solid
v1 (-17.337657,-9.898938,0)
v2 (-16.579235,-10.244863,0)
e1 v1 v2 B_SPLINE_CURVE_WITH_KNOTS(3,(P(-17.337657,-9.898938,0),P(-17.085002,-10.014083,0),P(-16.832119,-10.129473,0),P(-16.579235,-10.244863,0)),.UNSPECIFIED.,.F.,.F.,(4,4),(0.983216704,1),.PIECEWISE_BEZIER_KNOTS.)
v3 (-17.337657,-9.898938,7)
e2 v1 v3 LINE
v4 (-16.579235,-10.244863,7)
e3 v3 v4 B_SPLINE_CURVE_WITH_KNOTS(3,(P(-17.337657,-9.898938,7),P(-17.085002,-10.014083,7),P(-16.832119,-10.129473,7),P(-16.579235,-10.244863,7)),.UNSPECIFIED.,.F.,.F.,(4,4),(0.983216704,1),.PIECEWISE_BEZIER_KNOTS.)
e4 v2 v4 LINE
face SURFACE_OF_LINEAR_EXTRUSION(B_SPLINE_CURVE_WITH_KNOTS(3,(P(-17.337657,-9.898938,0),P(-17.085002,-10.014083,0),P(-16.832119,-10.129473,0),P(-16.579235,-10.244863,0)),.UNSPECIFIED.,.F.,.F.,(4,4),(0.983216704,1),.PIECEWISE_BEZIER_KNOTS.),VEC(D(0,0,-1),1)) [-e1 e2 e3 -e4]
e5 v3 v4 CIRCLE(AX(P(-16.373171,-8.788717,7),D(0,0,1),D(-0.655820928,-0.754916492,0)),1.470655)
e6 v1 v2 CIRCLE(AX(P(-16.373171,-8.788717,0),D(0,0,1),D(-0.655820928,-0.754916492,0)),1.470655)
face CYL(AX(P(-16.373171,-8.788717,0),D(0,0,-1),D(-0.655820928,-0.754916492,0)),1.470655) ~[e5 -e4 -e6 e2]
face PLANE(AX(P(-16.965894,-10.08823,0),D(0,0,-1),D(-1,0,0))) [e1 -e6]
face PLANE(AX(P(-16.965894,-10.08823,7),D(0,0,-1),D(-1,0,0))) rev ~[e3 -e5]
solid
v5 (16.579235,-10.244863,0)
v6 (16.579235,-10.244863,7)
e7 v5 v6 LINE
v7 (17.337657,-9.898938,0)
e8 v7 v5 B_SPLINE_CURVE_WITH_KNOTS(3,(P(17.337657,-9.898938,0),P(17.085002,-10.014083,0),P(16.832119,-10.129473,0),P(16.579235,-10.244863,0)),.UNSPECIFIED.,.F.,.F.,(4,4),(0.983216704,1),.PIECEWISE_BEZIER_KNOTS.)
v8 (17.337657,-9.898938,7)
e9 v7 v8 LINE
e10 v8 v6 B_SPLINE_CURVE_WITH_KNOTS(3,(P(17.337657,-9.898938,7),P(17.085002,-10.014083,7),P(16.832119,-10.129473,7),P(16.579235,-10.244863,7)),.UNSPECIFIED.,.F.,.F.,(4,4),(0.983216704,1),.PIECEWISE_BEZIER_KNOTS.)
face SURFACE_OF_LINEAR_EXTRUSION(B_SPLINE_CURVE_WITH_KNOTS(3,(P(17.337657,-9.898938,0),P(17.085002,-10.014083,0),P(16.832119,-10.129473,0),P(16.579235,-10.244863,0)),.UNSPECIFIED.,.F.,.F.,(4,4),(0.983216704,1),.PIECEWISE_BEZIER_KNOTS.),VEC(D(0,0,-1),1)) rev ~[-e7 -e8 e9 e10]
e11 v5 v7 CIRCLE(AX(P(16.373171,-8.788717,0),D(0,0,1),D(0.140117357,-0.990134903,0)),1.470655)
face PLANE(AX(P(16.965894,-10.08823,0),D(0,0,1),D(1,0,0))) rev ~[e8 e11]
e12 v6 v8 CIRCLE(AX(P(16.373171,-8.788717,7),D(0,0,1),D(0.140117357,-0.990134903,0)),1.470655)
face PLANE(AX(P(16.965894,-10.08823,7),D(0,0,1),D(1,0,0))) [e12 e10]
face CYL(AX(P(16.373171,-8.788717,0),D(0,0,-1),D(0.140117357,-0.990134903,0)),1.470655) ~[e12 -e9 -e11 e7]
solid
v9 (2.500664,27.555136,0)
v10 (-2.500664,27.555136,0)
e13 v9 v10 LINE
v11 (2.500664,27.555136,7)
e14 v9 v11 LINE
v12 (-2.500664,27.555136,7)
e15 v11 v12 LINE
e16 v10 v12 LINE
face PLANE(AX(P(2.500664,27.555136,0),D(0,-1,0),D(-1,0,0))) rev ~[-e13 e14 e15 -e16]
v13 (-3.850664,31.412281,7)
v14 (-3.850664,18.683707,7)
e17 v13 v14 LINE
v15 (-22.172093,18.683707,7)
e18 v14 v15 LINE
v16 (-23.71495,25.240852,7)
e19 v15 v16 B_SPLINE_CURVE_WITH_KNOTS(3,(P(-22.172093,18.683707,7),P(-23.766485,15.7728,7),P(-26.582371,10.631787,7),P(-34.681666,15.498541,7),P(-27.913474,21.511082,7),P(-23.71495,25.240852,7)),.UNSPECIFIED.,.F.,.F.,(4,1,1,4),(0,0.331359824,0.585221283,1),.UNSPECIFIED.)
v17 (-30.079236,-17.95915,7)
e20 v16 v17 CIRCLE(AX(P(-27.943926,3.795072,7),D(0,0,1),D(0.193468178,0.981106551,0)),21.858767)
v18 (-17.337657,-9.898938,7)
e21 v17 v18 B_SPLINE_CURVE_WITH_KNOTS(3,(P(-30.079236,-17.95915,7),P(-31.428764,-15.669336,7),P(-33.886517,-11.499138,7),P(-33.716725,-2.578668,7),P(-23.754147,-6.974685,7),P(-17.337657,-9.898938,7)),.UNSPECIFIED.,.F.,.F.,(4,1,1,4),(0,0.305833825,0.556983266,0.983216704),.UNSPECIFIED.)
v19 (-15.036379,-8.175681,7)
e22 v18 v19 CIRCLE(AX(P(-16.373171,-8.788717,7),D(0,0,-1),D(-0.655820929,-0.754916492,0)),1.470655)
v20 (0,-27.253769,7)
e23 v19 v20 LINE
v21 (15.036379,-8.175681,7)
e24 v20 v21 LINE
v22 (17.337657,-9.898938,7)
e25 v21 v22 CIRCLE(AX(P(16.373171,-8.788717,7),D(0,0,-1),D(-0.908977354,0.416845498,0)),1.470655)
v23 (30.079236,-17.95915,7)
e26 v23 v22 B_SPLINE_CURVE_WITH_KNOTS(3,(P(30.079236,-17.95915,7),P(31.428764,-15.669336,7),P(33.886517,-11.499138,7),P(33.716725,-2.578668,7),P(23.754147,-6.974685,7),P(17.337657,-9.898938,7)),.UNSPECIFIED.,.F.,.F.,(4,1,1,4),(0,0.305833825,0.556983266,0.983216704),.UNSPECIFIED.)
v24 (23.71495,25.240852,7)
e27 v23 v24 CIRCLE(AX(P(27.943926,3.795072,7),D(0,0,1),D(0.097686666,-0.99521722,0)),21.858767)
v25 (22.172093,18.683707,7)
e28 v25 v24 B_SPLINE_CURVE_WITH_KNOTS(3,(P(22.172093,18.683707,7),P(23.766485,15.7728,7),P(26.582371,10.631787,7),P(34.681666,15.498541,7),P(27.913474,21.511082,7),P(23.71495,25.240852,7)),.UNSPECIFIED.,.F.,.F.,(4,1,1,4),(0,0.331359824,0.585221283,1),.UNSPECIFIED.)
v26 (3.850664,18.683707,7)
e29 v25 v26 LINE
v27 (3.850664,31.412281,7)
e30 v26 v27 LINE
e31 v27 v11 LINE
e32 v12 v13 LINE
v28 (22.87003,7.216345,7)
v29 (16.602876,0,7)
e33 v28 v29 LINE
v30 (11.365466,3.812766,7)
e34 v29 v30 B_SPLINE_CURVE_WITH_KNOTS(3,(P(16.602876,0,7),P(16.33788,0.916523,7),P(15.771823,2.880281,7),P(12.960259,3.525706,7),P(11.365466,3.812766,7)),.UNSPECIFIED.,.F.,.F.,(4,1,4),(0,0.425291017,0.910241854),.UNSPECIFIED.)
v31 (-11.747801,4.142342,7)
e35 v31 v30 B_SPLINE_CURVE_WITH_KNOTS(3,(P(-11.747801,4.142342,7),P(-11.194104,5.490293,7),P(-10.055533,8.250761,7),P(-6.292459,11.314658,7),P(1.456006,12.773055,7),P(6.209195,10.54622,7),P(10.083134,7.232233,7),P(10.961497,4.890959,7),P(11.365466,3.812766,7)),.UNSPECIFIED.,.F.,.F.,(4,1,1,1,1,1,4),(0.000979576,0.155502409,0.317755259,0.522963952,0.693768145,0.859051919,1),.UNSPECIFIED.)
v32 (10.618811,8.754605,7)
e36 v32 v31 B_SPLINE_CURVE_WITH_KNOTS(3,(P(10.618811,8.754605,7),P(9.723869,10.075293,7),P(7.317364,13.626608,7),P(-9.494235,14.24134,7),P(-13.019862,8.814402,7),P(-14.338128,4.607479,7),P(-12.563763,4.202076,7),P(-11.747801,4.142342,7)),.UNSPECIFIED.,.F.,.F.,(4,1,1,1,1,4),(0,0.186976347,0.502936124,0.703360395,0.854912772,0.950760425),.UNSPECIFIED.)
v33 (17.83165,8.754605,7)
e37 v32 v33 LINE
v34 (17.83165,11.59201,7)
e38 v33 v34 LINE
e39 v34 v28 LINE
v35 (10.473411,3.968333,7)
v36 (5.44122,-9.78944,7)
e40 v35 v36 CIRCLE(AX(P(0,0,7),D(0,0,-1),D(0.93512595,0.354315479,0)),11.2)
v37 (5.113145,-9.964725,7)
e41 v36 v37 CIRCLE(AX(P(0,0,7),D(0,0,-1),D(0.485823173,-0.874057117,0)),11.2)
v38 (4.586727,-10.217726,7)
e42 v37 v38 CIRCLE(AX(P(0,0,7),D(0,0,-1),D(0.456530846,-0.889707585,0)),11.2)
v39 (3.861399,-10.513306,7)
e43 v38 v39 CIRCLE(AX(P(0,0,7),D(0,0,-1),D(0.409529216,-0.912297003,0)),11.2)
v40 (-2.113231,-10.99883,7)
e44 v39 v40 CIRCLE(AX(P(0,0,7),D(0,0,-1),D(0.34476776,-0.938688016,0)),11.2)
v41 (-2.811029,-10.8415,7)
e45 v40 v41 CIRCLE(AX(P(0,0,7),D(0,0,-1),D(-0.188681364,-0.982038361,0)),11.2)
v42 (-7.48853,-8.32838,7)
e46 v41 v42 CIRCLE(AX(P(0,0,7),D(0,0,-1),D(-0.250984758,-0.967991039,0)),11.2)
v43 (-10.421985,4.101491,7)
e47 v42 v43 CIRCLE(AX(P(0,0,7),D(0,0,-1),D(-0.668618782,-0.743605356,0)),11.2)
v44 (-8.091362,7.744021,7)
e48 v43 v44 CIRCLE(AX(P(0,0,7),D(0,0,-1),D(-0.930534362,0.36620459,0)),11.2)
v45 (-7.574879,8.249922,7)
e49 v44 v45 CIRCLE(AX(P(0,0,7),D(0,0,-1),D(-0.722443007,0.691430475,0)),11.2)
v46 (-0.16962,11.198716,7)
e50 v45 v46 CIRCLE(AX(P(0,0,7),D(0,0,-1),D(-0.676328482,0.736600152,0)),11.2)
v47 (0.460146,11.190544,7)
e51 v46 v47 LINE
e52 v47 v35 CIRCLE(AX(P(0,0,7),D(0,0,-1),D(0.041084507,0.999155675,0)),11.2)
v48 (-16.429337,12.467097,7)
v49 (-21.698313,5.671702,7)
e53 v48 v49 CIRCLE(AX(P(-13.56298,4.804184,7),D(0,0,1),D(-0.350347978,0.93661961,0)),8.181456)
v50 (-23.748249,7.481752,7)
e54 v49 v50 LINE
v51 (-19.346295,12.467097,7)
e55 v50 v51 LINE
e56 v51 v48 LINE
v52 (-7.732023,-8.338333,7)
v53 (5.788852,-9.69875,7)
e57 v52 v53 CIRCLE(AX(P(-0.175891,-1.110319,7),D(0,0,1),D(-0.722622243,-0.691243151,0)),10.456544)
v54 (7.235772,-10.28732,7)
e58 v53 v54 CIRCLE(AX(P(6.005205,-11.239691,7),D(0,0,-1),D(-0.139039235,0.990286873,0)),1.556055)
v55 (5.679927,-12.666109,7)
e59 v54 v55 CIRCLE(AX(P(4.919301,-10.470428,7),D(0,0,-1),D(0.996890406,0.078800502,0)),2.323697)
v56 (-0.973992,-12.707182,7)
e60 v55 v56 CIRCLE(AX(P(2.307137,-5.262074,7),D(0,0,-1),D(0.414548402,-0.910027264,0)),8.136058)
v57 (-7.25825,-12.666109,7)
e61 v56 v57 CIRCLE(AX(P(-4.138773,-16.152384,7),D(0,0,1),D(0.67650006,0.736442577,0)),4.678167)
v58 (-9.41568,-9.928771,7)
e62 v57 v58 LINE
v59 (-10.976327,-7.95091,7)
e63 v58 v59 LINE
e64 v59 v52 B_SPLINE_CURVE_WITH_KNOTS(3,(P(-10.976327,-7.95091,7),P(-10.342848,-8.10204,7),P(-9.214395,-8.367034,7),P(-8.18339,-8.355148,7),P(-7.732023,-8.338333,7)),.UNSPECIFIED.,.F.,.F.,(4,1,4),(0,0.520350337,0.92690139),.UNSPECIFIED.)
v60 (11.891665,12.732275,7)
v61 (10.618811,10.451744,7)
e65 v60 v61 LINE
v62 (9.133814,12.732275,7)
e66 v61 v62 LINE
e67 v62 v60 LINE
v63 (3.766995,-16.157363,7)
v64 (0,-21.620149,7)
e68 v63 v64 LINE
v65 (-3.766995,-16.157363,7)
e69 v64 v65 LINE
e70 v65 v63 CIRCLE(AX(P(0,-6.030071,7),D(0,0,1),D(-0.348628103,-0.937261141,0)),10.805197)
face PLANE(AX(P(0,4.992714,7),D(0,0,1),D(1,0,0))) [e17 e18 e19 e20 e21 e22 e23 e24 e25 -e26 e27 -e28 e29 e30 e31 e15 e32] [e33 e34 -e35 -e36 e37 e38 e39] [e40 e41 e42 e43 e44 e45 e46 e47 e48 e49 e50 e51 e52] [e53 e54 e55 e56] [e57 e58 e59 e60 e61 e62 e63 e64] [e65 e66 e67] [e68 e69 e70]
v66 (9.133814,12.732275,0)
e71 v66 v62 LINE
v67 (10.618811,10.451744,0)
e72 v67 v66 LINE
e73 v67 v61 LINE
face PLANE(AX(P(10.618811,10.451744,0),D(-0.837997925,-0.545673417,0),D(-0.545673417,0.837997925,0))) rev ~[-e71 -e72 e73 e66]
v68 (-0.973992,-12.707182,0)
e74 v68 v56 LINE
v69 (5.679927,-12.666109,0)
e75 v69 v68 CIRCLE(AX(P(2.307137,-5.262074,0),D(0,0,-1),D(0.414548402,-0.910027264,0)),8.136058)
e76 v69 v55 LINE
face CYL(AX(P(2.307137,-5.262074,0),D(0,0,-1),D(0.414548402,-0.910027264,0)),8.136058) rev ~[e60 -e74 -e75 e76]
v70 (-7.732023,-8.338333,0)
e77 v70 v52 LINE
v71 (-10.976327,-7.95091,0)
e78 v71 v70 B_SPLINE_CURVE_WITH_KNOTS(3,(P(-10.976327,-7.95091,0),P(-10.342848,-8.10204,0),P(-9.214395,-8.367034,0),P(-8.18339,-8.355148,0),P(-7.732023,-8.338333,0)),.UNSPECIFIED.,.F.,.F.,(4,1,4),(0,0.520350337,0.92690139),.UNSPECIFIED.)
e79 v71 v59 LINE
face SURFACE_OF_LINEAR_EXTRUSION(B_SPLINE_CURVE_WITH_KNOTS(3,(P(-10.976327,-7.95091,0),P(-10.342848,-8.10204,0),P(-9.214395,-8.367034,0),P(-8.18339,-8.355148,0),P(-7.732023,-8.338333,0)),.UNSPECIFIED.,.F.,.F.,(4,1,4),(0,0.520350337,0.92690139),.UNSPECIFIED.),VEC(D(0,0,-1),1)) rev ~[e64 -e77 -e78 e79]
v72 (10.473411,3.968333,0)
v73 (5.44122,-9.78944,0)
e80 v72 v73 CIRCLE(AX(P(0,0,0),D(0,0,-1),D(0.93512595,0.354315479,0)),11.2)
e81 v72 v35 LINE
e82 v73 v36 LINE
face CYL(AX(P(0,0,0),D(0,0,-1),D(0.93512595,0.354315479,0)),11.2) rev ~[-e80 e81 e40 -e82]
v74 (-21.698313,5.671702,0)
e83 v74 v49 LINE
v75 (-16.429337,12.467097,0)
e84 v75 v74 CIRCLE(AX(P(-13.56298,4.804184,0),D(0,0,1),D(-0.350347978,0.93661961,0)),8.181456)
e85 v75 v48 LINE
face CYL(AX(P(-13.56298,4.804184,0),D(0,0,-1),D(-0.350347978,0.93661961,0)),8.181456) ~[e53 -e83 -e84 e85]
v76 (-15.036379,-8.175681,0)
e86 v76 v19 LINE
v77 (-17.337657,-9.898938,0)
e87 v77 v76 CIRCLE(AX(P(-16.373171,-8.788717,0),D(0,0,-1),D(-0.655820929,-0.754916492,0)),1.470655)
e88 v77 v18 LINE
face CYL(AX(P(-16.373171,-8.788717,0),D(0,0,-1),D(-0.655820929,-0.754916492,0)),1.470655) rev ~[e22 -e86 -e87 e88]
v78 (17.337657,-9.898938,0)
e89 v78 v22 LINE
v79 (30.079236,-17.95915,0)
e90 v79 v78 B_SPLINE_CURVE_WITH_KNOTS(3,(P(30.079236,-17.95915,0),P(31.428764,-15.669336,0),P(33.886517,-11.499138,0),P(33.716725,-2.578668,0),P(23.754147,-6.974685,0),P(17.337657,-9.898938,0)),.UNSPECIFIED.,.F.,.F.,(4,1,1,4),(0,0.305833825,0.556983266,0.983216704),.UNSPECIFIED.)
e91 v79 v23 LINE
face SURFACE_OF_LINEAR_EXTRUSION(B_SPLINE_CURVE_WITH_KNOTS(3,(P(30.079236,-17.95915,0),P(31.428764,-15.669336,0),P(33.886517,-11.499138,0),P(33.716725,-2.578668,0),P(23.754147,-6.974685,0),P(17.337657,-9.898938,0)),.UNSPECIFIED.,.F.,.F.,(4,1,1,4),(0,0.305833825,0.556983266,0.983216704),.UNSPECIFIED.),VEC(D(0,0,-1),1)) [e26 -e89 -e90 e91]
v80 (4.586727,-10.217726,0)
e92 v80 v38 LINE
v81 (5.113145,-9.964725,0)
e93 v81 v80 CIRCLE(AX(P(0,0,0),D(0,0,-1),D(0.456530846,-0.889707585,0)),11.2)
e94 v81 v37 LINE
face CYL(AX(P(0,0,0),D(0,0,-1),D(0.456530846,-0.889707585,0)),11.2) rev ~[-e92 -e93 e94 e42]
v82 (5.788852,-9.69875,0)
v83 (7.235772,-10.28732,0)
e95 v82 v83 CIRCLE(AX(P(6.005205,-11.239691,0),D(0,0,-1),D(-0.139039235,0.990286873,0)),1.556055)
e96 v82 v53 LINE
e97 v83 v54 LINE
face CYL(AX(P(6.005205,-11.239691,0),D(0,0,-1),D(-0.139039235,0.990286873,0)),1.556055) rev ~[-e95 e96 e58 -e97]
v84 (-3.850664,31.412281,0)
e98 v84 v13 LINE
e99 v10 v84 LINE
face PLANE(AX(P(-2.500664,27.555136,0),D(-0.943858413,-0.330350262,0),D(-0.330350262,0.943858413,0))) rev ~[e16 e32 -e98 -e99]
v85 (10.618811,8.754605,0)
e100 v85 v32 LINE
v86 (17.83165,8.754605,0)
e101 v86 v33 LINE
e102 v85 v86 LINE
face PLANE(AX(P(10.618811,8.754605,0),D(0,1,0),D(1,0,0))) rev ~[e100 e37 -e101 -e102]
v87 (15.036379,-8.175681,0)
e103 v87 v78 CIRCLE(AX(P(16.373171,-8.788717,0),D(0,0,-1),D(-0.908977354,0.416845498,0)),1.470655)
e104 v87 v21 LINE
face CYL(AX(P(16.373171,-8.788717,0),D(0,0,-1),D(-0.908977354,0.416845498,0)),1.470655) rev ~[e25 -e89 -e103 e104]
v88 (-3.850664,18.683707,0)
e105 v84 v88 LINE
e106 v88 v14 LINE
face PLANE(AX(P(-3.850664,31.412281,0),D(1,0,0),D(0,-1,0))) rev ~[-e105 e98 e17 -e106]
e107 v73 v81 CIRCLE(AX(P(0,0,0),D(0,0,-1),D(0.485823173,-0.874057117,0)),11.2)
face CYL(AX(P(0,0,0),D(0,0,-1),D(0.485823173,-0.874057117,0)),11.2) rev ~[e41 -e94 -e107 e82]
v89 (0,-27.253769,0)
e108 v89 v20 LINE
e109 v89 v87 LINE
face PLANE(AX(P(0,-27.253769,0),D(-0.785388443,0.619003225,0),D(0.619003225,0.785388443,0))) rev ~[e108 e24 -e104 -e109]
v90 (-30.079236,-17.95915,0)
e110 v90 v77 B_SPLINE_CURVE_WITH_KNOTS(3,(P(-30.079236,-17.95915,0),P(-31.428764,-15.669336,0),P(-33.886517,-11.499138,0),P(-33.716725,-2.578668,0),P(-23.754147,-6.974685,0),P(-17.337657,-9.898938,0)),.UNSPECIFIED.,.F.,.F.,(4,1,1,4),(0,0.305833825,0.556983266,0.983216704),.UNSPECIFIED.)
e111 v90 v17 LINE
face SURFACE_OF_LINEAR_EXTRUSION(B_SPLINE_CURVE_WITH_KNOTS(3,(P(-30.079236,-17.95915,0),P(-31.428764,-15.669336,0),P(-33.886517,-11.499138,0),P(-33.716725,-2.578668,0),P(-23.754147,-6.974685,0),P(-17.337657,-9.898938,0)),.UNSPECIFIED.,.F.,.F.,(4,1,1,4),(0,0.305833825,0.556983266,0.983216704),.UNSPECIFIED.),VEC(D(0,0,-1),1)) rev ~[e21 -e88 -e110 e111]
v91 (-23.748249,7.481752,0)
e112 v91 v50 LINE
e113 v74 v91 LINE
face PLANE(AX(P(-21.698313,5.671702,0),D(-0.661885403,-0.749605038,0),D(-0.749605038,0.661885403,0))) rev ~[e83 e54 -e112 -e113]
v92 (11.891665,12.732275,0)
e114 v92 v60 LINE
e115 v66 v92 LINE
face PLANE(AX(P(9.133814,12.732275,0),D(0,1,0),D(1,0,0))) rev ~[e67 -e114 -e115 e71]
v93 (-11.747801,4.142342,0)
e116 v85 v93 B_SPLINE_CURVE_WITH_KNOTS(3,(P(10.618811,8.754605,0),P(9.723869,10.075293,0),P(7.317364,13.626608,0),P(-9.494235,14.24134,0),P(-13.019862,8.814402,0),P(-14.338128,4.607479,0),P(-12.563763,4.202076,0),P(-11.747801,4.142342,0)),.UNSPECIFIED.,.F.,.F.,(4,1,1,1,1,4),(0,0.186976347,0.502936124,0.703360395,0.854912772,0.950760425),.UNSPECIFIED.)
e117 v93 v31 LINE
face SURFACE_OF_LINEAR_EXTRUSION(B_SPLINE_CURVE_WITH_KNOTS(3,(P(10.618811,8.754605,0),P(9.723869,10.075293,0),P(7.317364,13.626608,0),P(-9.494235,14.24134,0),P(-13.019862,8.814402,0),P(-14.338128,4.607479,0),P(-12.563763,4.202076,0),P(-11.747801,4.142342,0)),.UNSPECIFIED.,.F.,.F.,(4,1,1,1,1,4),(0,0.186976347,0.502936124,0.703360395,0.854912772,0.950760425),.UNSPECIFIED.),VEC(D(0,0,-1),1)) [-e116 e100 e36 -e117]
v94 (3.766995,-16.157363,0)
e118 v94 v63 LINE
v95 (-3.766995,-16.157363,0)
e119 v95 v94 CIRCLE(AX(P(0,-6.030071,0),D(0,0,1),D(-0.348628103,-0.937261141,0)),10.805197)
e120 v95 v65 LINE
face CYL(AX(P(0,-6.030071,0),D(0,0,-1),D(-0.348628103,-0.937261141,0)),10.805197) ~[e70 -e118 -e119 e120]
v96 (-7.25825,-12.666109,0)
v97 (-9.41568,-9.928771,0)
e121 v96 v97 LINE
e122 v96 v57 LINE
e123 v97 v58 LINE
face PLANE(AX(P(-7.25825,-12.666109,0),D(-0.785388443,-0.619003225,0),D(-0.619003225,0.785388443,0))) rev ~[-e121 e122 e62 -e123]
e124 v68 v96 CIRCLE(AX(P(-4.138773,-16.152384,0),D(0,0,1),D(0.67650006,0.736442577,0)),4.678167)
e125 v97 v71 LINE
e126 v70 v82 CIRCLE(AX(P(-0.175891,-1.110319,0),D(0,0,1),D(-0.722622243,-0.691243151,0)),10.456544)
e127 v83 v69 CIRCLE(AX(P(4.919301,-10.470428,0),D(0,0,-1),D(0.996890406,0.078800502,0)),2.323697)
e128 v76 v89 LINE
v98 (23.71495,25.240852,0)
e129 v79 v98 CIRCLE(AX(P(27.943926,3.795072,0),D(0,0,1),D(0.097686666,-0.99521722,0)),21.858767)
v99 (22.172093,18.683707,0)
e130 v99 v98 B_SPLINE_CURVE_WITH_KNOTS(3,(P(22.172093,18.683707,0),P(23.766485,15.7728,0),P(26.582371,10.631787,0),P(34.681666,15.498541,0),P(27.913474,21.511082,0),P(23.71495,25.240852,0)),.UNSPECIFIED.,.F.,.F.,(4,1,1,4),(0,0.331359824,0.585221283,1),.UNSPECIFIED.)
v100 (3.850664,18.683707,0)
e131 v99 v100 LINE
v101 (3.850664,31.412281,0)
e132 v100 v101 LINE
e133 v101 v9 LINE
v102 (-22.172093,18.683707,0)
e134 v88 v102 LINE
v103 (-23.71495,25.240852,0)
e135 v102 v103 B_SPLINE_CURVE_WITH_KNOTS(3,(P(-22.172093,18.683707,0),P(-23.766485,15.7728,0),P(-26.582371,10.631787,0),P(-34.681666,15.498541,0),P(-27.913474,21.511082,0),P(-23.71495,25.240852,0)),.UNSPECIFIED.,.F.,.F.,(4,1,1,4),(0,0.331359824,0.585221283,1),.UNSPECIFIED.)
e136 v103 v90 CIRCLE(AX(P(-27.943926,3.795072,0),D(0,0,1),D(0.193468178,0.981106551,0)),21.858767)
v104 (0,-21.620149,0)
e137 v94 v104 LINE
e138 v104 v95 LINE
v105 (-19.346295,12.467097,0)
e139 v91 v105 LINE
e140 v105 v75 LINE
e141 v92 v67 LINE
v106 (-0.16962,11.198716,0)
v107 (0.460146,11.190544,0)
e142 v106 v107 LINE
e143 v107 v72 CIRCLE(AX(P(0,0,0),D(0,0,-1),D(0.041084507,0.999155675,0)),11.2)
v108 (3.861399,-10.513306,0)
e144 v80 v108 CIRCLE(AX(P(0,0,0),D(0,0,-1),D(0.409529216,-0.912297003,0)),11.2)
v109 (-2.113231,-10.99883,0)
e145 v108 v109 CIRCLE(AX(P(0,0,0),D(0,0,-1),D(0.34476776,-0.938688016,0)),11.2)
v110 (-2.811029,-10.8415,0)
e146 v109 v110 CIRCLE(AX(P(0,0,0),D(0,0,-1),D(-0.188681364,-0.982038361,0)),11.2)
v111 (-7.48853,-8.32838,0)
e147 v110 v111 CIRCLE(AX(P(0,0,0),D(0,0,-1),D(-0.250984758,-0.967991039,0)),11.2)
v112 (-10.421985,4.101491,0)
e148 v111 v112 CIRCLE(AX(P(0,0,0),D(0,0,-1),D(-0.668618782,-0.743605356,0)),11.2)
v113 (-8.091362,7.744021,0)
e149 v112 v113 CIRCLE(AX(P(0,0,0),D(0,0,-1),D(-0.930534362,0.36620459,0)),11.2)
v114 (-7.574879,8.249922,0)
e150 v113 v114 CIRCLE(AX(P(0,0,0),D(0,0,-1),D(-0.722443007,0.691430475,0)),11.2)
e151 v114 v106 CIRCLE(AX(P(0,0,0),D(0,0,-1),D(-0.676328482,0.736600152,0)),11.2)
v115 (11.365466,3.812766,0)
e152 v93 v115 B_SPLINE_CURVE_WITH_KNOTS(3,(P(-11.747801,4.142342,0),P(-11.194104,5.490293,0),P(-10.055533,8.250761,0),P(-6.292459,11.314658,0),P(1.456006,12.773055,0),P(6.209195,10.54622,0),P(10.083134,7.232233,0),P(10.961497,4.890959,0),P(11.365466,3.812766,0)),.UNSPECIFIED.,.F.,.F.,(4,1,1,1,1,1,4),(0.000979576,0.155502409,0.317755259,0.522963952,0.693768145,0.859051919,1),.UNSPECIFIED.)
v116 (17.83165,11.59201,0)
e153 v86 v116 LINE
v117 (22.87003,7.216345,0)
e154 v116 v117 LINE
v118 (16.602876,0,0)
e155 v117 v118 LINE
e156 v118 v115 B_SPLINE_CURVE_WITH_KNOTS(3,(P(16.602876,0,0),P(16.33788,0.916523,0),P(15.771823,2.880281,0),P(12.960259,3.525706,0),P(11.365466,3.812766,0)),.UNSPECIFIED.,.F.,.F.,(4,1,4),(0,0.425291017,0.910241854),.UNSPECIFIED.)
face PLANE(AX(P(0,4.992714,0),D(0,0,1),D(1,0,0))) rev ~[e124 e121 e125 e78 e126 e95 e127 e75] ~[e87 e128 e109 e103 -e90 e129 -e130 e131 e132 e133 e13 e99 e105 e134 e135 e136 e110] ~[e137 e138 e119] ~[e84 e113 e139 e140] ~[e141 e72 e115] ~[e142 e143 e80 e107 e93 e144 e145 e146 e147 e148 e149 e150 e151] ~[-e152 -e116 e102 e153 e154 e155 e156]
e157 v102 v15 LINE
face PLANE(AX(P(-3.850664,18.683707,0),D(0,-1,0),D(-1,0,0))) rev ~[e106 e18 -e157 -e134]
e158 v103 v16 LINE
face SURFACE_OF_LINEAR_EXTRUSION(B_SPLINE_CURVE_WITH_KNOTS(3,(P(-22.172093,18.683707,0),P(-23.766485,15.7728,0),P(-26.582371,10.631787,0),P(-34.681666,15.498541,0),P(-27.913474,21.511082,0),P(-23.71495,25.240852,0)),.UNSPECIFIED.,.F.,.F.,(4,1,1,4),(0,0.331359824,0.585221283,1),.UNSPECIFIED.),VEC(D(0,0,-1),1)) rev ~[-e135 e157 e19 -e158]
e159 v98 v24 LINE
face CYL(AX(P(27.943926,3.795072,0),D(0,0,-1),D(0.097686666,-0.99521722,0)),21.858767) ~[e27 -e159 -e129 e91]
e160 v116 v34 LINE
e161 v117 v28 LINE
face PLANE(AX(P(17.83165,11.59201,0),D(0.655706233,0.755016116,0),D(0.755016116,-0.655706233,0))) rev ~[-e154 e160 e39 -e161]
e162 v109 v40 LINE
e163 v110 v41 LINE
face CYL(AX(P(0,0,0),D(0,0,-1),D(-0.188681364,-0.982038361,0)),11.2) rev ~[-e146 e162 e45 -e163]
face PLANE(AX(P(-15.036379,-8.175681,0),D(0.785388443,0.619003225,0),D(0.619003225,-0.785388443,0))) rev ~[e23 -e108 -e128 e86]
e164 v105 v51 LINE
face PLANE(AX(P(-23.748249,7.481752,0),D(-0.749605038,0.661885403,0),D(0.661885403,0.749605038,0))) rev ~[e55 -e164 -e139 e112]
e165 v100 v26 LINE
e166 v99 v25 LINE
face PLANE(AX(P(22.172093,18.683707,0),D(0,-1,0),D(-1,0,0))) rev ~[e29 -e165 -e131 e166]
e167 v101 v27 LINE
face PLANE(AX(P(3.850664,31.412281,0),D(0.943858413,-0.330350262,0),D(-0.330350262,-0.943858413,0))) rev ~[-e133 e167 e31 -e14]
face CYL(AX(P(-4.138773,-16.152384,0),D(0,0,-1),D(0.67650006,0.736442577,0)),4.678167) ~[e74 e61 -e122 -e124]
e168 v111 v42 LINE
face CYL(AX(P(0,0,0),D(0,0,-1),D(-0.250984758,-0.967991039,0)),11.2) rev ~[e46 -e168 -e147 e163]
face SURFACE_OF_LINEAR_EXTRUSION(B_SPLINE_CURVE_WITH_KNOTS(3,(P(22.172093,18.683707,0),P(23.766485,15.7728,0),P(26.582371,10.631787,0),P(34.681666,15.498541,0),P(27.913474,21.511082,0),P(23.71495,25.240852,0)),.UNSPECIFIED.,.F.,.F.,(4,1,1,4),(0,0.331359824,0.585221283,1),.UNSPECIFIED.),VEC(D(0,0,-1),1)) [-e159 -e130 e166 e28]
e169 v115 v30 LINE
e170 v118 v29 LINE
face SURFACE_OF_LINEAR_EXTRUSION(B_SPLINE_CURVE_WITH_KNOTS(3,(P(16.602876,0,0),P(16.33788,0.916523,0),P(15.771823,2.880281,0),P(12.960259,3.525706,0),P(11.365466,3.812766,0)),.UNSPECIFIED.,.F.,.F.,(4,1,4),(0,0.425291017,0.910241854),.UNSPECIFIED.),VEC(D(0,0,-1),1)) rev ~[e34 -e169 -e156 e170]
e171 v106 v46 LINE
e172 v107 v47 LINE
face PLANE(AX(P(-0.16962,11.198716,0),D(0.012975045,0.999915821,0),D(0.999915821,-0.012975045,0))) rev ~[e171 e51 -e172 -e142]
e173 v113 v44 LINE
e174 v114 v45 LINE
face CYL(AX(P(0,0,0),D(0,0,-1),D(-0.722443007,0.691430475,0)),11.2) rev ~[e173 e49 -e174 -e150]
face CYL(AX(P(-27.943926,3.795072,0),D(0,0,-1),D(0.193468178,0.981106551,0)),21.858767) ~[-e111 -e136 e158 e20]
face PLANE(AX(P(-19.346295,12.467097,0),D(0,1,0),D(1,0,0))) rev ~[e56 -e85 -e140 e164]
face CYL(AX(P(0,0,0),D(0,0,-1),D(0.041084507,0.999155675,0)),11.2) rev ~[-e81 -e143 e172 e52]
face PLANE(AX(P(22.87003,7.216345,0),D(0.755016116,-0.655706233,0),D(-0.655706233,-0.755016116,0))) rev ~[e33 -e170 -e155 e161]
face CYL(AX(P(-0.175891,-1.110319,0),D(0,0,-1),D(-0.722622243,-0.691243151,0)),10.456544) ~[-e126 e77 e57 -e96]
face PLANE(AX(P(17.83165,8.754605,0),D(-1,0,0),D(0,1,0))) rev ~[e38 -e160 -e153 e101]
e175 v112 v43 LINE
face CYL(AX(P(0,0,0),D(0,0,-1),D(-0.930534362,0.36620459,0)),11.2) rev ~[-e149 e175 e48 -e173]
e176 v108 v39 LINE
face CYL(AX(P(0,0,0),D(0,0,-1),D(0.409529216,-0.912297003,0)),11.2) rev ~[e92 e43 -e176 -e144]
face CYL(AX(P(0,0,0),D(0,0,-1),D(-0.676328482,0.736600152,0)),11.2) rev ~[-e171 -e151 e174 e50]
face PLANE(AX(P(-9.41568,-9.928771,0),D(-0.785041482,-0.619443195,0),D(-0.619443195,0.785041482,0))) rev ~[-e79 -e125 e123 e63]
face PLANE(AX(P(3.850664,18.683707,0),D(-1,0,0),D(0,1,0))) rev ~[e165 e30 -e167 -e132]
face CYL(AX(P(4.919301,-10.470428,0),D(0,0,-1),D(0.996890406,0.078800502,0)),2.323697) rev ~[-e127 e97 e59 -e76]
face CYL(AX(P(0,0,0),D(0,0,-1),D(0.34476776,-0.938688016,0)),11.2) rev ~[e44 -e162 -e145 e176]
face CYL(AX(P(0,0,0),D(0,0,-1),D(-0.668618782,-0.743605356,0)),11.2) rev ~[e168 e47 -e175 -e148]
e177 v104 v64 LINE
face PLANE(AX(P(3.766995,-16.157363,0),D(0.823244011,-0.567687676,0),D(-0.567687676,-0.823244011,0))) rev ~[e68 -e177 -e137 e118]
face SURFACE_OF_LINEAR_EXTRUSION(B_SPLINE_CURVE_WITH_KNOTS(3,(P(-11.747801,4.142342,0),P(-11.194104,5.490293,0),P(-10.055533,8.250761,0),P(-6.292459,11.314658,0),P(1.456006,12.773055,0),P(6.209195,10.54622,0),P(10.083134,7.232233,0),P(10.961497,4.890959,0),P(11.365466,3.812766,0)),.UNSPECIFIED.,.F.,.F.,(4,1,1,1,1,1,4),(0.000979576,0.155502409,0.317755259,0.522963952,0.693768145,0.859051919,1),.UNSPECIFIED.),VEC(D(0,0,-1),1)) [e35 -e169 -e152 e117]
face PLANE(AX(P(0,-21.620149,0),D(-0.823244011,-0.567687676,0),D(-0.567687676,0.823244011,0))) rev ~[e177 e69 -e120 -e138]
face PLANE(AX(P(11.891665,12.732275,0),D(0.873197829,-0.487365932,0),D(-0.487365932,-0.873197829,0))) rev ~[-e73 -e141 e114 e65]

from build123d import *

# Parameters (mm, degrees)
F1_DEPTH = 7


# Not quite as in the source:
# - a feature names something its author has since deleted; it is built from what else it names


with BuildPart() as f1:
    # F0 (on Top) → F1 (new body)
    with BuildSketch(Plane.XY):
        with BuildLine():
            ThreePointArc((16.5792349726, -10.2448631078), (16.9834682398, -10.1267607204), (17.3376568133, -9.8989380643))
            add(Edge.make_bspline(
                [(17.3376568133, -9.8989380643), (17.0850021821, -10.01408297), (16.8321185773, -10.1294730389), (16.5792349726, -10.2448631078)],
                knots=[0.9832167043, 0.9832167043, 0.9832167043, 0.9832167043, 1, 1, 1, 1], degree=3))
        make_face()
    extrude(amount=F1_DEPTH)


with BuildPart() as f1b:
    # F0 (on Top) → F1, piece 2 (new body)
    with BuildSketch(Plane.XY):
        with BuildLine():
            add(Edge.make_bspline(
                [(-17.3376568133, -9.8989380643), (-17.0850021821, -10.01408297), (-16.8321185773, -10.1294730389), (-16.5792349726, -10.2448631078)],
                knots=[0.9832167043, 0.9832167043, 0.9832167043, 0.9832167043, 1, 1, 1, 1], degree=3))
            ThreePointArc((-17.3376568133, -9.8989380643), (-16.9834682398, -10.1267607204), (-16.5792349726, -10.2448631078))
        make_face()
    extrude(amount=F1_DEPTH)


with BuildPart() as f1c:
    # F0 (on Top) → F1, piece 3 (new body)
    with BuildSketch(Plane.XY):
        with BuildLine():
            Line((-3.8506640121, 25.8194226772), (-3.8506640121, 18.6837073416))
            Line((-3.8506640121, 18.6837073416), (-22.1720933914, 18.6837073416))
            add(Edge.make_bspline(
                [(-22.1720933914, 18.6837073416), (-23.7664845821, 15.772799918), (-26.5823710911, 10.6317874798), (-34.6816663683, 15.4985414684), (-27.9134744848, 21.511081938), (-23.7149503082, 25.2408515662)],
                knots=[0, 0, 0, 0, 0.3313598243, 0.5852212834, 1, 1, 1, 1], degree=3))
            ThreePointArc((-23.7149503082, 25.2408515662), (-49.5692789527, 6.9809498228), (-30.0792362541, -17.9591495544))
            add(Edge.make_bspline(
                [(-30.0792362541, -17.9591495544), (-31.4287635496, -15.6693361188), (-33.8865169415, -11.4991375929), (-33.716724634, -2.5786683332), (-23.7541469989, -6.9746846915), (-17.3376568133, -9.8989380643)],
                knots=[0, 0, 0, 0, 0.3058338248, 0.5569832657, 0.9832167043, 0.9832167043, 0.9832167043, 0.9832167043], degree=3))
            ThreePointArc((-17.3376568133, -9.8989380643), (-17.2546789352, -7.6115300309), (-15.0363789871, -8.1756808795))
            Line((-15.0363789871, -8.1756808795), (0, -27.2537693381))
            Line((0, -27.2537693381), (15.0363789871, -8.1756808795))
            ThreePointArc((15.0363789871, -8.1756808795), (17.2546789352, -7.6115300309), (17.3376568133, -9.8989380643))
            add(Edge.make_bspline(
                [(30.0792362541, -17.9591495544), (31.4287635496, -15.6693361188), (33.8865169415, -11.4991375929), (33.716724634, -2.5786683332), (23.7541469989, -6.9746846915), (17.3376568133, -9.8989380643)],
                knots=[0, 0, 0, 0, 0.3058338248, 0.5569832657, 0.9832167043, 0.9832167043, 0.9832167043, 0.9832167043], degree=3))
            ThreePointArc((30.0792362541, -17.9591495544), (49.5692789527, 6.9809498228), (23.7149503082, 25.2408515662))
            add(Edge.make_bspline(
                [(22.1720933914, 18.6837073416), (23.7664845821, 15.772799918), (26.5823710911, 10.6317874798), (34.6816663683, 15.4985414684), (27.9134744848, 21.511081938), (23.7149503082, 25.2408515662)],
                knots=[0, 0, 0, 0, 0.3313598243, 0.5852212834, 1, 1, 1, 1], degree=3))
            Line((22.1720933914, 18.6837073416), (3.8506640121, 18.6837073416))
            Line((3.8506640121, 18.6837073416), (3.8506640121, 25.8194226772))
            Line((3.8506640121, 25.8194226772), (3.8506640121, 31.412281096))
            Line((3.8506640121, 31.412281096), (2.5006639771, 27.5551360101))
            Line((2.5006639771, 27.5551360101), (0, 27.5551360101))
            Line((0, 27.5551360101), (-2.5006639771, 27.5551360101))
            Line((-2.5006639771, 27.5551360101), (-3.8506640121, 31.412281096))
            Line((-3.8506640121, 31.412281096), (-3.8506640121, 25.8194226772))
        make_face()
        Polygon((-20.2526636422, 15.1130193844), (0, 15.1130193844), (20.2526636422, 15.1130193844), (26.1378940195, 8.3870412782), (0, -24.7384030372), (-26.1378940195, 8.3870412782), align=None, mode=Mode.SUBTRACT)
        Polygon((20.2526636422, 15.1130193844), (0, 15.1130193844), (-20.2526636422, 15.1130193844), (-26.1378940195, 8.3870412782), (0, -24.7384030372), (26.1378940195, 8.3870412782), align=None)
        with BuildLine():
            Line((0, -21.6201487929), (-3.766995389, -16.1573626101))
            ThreePointArc((-3.766995389, -16.1573626101), (0, -16.8352683554), (3.766995389, -16.1573626101))
            Line((3.766995389, -16.1573626101), (0, -21.6201487929))
        make_face(mode=Mode.SUBTRACT)
        with BuildLine():
            add(Edge.make_bspline(
                [(11.3654661838, 3.8127656249), (11.0702905387, 3.8658966707), (10.7717963194, 3.9170817546), (10.4734106347, 3.9683333625)],
                knots=[0.9102418538, 0.9102418538, 0.9102418538, 0.9102418538, 1, 1, 1, 1], degree=3))
            ThreePointArc((10.4734106347, 3.9683333625), (10.5184572741, -3.8473440933), (5.4412195451, -9.7894397114))
            ThreePointArc((5.4412195451, -9.7894397114), (5.6124095819, -9.7340283467), (5.7888518665, -9.6987499078))
            ThreePointArc((5.7888518665, -9.6987499078), (6.5915164137, -9.7983213926), (7.2357721967, -10.2873196974))
            ThreePointArc((7.2357721967, -10.2873196974), (6.8639840342, -11.7423461015), (5.6799273007, -12.666109018))
            ThreePointArc((5.6799273007, -12.666109018), (2.3573584338, -13.3979774494), (-0.9739922243, -12.7071822062))
            ThreePointArc((-0.9739922243, -12.7071822062), (-4.1081974234, -11.4743163831), (-7.2582499124, -12.666109018))
            Line((-7.2582499124, -12.666109018), (-9.4156803641, -9.9287711898))
            Line((-9.4156803641, -9.9287711898), (-10.9763270325, -7.9509104535))
            add(Edge.make_bspline(
                [(-10.9763270325, -7.9509104535), (-10.3428475671, -8.1020396785), (-9.2143948724, -8.3670340298), (-8.1833899777, -8.3551484222), (-7.7320225253, -8.3383332333)],
                knots=[0, 0, 0, 0, 0.5203503372, 0.9269013897, 0.9269013897, 0.9269013897, 0.9269013897], degree=3))
            add(Edge.make_bspline(
                [(-7.7320225253, -8.3383332333), (-7.6508658457, -8.3353098321), (-7.569736476, -8.3319113533), (-7.488530354, -8.3283799827)],
                knots=[0.9269013897, 0.9269013897, 0.9269013897, 0.9269013897, 1, 1, 1, 1], degree=3))
            ThreePointArc((-7.488530354, -8.3283799827), (-10.9005534004, -2.572534852), (-10.421984849, 4.1014914125))
            add(Edge.make_bspline(
                [(-11.7478008935, 4.1423421903), (-11.3286185316, 4.111655498), (-10.8755128269, 4.1066551355), (-10.421984849, 4.1014914125)],
                knots=[0.9507604249, 0.9507604249, 0.9507604249, 0.9507604249, 1, 1, 1, 1], degree=3))
            add(Edge.make_bspline(
                [(10.6188114733, 8.7546054274), (9.7238694578, 10.0752930999), (7.317364425, 13.6266079113), (-9.4942346395, 14.2413402565), (-13.0198623921, 8.8144018215), (-14.3381284396, 4.6074785308), (-12.5637633708, 4.2020755945), (-11.7478008935, 4.1423421903)],
                knots=[0, 0, 0, 0, 0.1869763466, 0.5029361243, 0.7033603953, 0.8549127717, 0.9507604249, 0.9507604249, 0.9507604249, 0.9507604249], degree=3))
            Line((10.6188114733, 8.7546054274), (12.9112154245, 8.7546054274))
            Line((12.9112154245, 8.7546054274), (14.2252305523, 8.7546054274))
            Line((14.2252305523, 8.7546054274), (17.8316496313, 8.7546054274))
            Line((17.8316496313, 8.7546054274), (17.8316496313, 11.5920095704))
            Line((17.8316496313, 11.5920095704), (22.8700302541, 7.2163445875))
            Line((22.8700302541, 7.2163445875), (16.6028764442, 0))
            add(Edge.make_bspline(
                [(16.6028764442, 0), (16.3378800898, 0.9165232113), (15.7718233446, 2.8802807514), (12.9602593254, 3.5257059408), (11.3654661838, 3.8127656249)],
                knots=[0, 0, 0, 0, 0.4252910171, 0.9102418538, 0.9102418538, 0.9102418538, 0.9102418538], degree=3))
        make_face(mode=Mode.SUBTRACT)
        with BuildLine():
            Line((-21.6983128122, 5.6717018071), (-23.7482488155, 7.4817519635))
            Line((-23.7482488155, 7.4817519635), (-19.3462949246, 12.4670965597))
            Line((-19.3462949246, 12.4670965597), (-16.4293367416, 12.4670965597))
            ThreePointArc((-16.4293367416, 12.4670965597), (-20.0285535224, 9.8174252893), (-21.6983128122, 5.6717018071))
        make_face(mode=Mode.SUBTRACT)
        Polygon((10.6188114733, 10.4517443106), (9.1338139027, 12.7322748303), (11.8916649371, 12.7322748303), align=None, mode=Mode.SUBTRACT)
        with BuildLine():
            ThreePointArc((5.7888518665, -9.6987499078), (5.6124095819, -9.7340283467), (5.4412195451, -9.7894397114))
            ThreePointArc((5.4412195451, -9.7894397114), (5.2779102429, -9.878444385), (5.1131454862, -9.9647249454))
            ThreePointArc((5.1131454862, -9.9647249454), (4.8515858311, -10.0946577417), (4.5867272221, -10.2177264296))
            ThreePointArc((4.5867272221, -10.2177264296), (4.2266476764, -10.3718585326), (3.8613989114, -10.5133057811))
            ThreePointArc((3.8613989114, -10.5133057811), (0.9071691587, -11.1632004424), (-2.1132312692, -10.998829647))
            ThreePointArc((-2.1132312692, -10.998829647), (-2.4633866315, -10.9257368769), (-2.8110292899, -10.8414996348))
            ThreePointArc((-2.8110292899, -10.8414996348), (-5.3008654775, -9.8661454069), (-7.488530354, -8.3283799827))
            add(Edge.make_bspline(
                [(-7.7320225253, -8.3383332333), (-7.6508658457, -8.3353098321), (-7.569736476, -8.3319113533), (-7.488530354, -8.3283799827)],
                knots=[0.9269013897, 0.9269013897, 0.9269013897, 0.9269013897, 1, 1, 1, 1], degree=3))
            ThreePointArc((-7.7320225253, -8.3383332333), (-1.22270189, -11.5143324097), (5.7888518665, -9.6987499078))
        make_face()
        with BuildLine():
            ThreePointArc((-7.5748789973, 8.2499217073), (-4.1434483054, 10.4053753484), (-0.1696203788, 11.1987155034))
            Line((-0.1696203788, 11.1987155034), (0.4601464831, 11.190543562))
            ThreePointArc((0.4601464831, 11.190543562), (6.551774405, 9.0837355832), (10.4734106347, 3.9683333625))
            add(Edge.make_bspline(
                [(11.3654661838, 3.8127656249), (11.0702905387, 3.8658966707), (10.7717963194, 3.9170817546), (10.4734106347, 3.9683333625)],
                knots=[0.9102418538, 0.9102418538, 0.9102418538, 0.9102418538, 1, 1, 1, 1], degree=3))
            add(Edge.make_bspline(
                [(-11.7478008927, 4.1423421862), (-11.1941041625, 5.4902929916), (-10.0555326267, 8.2507614708), (-6.2924585186, 11.3146577634), (1.4560057353, 12.7730545434), (6.2091952943, 10.5462199473), (10.0831340079, 7.2322332261), (10.961497048, 4.890959233), (11.3654661838, 3.8127656249)],
                knots=[0.0009795765, 0.0009795765, 0.0009795765, 0.0009795765, 0.1555024095, 0.3177552589, 0.5229639524, 0.6937681454, 0.8590519191, 1, 1, 1, 1], degree=3))
            add(Edge.make_bspline(
                [(-11.7478008935, 4.1423421903), (-11.3286185316, 4.111655498), (-10.8755128269, 4.1066551355), (-10.421984849, 4.1014914125)],
                knots=[0.9507604249, 0.9507604249, 0.9507604249, 0.9507604249, 1, 1, 1, 1], degree=3))
            ThreePointArc((-10.421984849, 4.1014914125), (-9.4341404452, 6.0363063259), (-8.0913616782, 7.7440213193))
            ThreePointArc((-8.0913616782, 7.7440213193), (-7.837203457, 8.0011400421), (-7.5748789973, 8.2499217073))
        make_face()
    extrude(amount=F1_DEPTH)


solid = Compound([f1.part, f1b.part, f1c.part])
